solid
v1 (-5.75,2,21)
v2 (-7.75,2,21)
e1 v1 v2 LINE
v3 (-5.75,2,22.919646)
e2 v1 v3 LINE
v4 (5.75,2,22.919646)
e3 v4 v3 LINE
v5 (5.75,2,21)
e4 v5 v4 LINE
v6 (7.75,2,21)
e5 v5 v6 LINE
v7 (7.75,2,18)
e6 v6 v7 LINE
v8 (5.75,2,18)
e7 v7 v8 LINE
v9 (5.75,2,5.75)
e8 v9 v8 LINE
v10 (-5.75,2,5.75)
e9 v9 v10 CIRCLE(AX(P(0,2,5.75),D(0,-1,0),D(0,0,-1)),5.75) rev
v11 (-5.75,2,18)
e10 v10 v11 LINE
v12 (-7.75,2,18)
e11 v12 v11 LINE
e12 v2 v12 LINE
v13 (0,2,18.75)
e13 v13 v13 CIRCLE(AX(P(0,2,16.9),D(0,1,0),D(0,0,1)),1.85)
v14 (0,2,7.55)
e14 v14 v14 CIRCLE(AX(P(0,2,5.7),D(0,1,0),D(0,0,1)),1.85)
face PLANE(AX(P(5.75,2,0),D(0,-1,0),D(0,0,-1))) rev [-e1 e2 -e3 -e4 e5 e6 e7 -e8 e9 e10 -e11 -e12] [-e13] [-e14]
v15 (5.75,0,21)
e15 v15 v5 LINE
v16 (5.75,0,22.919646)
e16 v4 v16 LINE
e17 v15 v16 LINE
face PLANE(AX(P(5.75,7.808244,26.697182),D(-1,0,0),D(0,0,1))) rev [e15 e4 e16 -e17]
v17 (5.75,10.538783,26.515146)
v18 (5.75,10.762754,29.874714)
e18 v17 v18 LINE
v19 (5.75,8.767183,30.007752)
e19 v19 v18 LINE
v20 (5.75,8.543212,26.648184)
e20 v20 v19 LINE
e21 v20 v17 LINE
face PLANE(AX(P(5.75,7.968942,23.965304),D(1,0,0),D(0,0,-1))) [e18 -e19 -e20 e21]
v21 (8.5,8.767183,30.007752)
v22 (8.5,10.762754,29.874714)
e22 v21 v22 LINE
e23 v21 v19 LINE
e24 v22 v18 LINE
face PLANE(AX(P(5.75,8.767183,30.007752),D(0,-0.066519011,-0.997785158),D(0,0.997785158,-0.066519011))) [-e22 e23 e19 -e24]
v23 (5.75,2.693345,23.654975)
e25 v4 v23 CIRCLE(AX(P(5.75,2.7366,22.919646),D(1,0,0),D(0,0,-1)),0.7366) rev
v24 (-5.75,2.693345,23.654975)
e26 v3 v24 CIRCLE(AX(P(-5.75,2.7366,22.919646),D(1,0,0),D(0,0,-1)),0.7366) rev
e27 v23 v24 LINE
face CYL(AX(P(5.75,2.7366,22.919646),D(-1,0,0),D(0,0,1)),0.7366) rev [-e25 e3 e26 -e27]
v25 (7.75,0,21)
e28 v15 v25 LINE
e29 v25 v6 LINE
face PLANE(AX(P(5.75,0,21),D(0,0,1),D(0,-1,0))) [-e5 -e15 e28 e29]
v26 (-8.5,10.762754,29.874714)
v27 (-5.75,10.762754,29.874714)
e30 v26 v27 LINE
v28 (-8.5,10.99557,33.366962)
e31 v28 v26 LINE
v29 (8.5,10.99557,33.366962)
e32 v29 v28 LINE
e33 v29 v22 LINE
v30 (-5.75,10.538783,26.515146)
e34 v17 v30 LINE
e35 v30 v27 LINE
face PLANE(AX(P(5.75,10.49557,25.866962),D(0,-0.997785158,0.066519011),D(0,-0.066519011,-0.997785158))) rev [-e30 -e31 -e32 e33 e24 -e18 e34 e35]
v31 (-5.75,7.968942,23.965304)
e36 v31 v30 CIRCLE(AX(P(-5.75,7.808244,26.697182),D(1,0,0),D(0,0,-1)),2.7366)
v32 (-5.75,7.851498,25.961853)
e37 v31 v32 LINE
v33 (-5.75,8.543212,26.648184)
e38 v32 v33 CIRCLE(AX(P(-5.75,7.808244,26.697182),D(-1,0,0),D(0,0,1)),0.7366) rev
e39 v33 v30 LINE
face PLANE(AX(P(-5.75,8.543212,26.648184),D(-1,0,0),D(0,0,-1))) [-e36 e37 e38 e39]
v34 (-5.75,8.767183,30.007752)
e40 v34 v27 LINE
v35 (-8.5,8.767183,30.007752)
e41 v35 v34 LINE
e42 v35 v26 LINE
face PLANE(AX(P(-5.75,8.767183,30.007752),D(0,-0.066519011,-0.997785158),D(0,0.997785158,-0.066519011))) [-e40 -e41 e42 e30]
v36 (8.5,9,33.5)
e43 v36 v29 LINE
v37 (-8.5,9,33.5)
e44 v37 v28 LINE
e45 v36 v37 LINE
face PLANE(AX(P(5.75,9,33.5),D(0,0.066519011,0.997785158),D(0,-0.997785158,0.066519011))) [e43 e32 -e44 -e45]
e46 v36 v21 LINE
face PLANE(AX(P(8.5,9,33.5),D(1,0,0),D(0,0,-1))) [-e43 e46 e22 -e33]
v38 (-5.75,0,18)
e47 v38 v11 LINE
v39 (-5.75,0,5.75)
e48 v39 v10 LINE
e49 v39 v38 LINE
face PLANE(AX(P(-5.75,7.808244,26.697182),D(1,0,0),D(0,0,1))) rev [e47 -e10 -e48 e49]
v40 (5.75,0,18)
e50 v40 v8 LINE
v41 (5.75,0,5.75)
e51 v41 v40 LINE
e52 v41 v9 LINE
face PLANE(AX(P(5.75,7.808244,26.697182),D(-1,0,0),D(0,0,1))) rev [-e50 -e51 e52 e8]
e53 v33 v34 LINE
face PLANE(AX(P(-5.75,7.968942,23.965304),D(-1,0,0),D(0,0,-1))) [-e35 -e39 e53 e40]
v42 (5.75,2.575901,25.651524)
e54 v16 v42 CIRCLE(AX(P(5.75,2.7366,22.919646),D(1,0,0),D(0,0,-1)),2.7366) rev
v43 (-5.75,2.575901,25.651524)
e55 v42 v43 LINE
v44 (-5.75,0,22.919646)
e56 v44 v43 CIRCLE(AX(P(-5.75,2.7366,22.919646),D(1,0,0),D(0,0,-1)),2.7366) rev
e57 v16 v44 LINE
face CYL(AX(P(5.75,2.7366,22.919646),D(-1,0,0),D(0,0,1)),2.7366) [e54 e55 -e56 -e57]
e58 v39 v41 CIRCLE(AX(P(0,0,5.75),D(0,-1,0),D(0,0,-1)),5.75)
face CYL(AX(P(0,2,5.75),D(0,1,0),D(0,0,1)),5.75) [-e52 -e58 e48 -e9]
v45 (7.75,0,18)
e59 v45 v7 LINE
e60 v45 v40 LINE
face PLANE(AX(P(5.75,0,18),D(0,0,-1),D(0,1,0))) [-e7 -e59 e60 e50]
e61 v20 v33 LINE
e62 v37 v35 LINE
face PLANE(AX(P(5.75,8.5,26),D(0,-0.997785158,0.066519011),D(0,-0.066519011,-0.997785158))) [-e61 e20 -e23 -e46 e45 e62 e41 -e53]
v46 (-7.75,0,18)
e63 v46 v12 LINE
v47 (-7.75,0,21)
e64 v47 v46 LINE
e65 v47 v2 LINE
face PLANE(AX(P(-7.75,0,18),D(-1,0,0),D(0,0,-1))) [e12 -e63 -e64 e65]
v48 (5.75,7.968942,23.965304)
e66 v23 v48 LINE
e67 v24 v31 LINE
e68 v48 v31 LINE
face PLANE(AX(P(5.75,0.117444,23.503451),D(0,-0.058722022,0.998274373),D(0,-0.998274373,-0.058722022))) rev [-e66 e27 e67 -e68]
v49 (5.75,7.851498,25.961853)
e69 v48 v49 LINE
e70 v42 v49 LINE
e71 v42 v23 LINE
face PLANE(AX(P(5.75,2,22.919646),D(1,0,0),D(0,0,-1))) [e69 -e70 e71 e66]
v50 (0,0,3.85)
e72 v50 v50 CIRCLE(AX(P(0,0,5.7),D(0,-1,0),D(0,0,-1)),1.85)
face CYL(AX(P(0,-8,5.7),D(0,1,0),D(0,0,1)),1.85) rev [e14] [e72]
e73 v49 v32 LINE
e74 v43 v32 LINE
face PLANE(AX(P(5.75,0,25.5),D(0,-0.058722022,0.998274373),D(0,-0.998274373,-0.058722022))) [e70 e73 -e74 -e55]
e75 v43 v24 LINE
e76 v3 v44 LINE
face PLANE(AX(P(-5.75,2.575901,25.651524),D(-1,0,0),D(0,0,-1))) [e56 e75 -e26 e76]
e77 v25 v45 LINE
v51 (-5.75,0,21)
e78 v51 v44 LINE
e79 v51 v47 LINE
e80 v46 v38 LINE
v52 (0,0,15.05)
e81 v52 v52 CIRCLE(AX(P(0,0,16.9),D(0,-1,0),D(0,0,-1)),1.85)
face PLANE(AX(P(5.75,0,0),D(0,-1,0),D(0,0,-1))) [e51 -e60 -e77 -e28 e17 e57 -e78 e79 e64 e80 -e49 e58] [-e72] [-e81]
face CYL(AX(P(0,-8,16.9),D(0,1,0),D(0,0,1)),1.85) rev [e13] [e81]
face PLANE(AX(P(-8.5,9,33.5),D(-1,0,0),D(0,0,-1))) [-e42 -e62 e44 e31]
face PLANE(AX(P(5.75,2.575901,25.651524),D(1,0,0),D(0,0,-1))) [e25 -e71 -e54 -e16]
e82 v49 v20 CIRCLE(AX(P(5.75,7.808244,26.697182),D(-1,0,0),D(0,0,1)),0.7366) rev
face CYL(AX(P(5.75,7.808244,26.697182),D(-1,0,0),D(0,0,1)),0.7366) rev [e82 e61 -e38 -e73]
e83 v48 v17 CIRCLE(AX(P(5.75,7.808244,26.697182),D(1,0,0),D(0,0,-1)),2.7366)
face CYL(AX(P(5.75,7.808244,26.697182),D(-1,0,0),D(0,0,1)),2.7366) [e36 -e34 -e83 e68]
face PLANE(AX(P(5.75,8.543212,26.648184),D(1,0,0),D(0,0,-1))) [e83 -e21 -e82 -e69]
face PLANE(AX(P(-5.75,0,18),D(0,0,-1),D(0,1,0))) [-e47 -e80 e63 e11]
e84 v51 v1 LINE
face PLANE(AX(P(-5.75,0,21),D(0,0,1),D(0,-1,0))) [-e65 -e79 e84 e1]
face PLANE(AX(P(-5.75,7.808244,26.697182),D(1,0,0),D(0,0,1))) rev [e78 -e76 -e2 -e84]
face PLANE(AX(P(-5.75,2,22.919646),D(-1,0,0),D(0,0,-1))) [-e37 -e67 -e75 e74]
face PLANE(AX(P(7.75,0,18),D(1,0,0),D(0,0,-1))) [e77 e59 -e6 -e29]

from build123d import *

# Parameters (mm, degrees)
T_LE_DE_BASE_PLI_E1_DEPTH = 5.75
ESQUISSE6_W               = 2
ESQUISSE6_H               = 3
PATTE1_DEPTH              = 2
ESQUISSE9_W               = 2.75
ESQUISSE9_H               = 3.5
PATTE2_DEPTH              = 2
ESQUISSE12_R              = 1.85
ENL_V_MAT_EXTRU_1_DEPTH   = 10
CONG_1_R                  = 5.75


# Sheet-metal steps are written as plain solids
with BuildPart() as part:
    # Esquisse1 → Tôle de base pliée1 (new body)
    with BuildSketch(Plane(origin=(0, 0, 0), x_dir=(0, 0, -1), z_dir=(1, 0, 0))):
        with BuildLine():
            Line((0, 0), (-22.919645957, 0))
            ThreePointArc((-22.919645957, 0), (-24.797039301, 0.745526473), (-25.651523607, 2.575901315))
            Line((-25.651523607, 2.575901315), (-25.961852844, 7.85149835))
            ThreePointArc((-25.961852844, 7.85149835), (-26.174296323, 8.327060048), (-26.648183844, 8.543212256))
            Line((-26.648183844, 8.543212256), (-33.5, 9))
            Line((-33.5, 9), (-33.366961979, 10.995570316))
            Line((-33.366961979, 10.995570316), (-26.515145823, 10.538782572))
            ThreePointArc((-26.515145823, 10.538782572), (-24.754569405, 9.735738676), (-23.965304098, 7.968942394))
            Line((-23.965304098, 7.968942394), (-23.65497486, 2.693345359))
            ThreePointArc((-23.65497486, 2.693345359), (-23.424976637, 2.200670467), (-22.919645957, 2))
            Line((-22.919645957, 2), (0, 2))
            Line((0, 2), (0, 0))
        make_face()
    extrude(amount=T_LE_DE_BASE_PLI_E1_DEPTH)

    # Esquisse6 → Patte1 (add)
    with BuildSketch(Plane(origin=(0, 2, 0), x_dir=(1, 0, 0), z_dir=(0, 1, 0))):
        with Locations((6.75, -19.5)):
            Rectangle(ESQUISSE6_W, ESQUISSE6_H)
    extrude(amount=-PATTE1_DEPTH)

    # Esquisse9 → Patte2 (add)
    with BuildSketch(Plane(origin=(0, 8.732295979, -0.582153065), x_dir=(1, 0, 0), z_dir=(0, 0.997785157856609, -0.06651901052377376))):
        with Locations((7.125, -32.274473883)):
            Rectangle(ESQUISSE9_W, ESQUISSE9_H)
    extrude(amount=-PATTE2_DEPTH)

    # Esquisse12 → Enlèv. mat.-Extru.1 (cut)
    with BuildSketch(Plane(origin=(0, 2, 0), x_dir=(1, 0, 0), z_dir=(0, 1, 0))):
        with Locations((0, -5.7)):
            Circle(ESQUISSE12_R)
        with Locations((0, -16.9)):
            Circle(ESQUISSE12_R)
    extrude(amount=-ENL_V_MAT_EXTRU_1_DEPTH, mode=Mode.SUBTRACT)

    # Congé1
    cong_1_edges = [part.edges().sort_by_distance(p)[0] for p in [
        (5.75, 1, 0),
    ]]
    fillet(cong_1_edges, radius=CONG_1_R - 0.0001)  # a hair under: the kernel refuses the full size

    # Symétrie1: part across plane


with BuildPart() as part_1:
    add(part.part)
    add(part.part.mirror(Plane(origin=(0, 2.693345359, 23.65497486), x_dir=(0, 0, 1), z_dir=(-1, 0, 0))))


solid = part_1.part
